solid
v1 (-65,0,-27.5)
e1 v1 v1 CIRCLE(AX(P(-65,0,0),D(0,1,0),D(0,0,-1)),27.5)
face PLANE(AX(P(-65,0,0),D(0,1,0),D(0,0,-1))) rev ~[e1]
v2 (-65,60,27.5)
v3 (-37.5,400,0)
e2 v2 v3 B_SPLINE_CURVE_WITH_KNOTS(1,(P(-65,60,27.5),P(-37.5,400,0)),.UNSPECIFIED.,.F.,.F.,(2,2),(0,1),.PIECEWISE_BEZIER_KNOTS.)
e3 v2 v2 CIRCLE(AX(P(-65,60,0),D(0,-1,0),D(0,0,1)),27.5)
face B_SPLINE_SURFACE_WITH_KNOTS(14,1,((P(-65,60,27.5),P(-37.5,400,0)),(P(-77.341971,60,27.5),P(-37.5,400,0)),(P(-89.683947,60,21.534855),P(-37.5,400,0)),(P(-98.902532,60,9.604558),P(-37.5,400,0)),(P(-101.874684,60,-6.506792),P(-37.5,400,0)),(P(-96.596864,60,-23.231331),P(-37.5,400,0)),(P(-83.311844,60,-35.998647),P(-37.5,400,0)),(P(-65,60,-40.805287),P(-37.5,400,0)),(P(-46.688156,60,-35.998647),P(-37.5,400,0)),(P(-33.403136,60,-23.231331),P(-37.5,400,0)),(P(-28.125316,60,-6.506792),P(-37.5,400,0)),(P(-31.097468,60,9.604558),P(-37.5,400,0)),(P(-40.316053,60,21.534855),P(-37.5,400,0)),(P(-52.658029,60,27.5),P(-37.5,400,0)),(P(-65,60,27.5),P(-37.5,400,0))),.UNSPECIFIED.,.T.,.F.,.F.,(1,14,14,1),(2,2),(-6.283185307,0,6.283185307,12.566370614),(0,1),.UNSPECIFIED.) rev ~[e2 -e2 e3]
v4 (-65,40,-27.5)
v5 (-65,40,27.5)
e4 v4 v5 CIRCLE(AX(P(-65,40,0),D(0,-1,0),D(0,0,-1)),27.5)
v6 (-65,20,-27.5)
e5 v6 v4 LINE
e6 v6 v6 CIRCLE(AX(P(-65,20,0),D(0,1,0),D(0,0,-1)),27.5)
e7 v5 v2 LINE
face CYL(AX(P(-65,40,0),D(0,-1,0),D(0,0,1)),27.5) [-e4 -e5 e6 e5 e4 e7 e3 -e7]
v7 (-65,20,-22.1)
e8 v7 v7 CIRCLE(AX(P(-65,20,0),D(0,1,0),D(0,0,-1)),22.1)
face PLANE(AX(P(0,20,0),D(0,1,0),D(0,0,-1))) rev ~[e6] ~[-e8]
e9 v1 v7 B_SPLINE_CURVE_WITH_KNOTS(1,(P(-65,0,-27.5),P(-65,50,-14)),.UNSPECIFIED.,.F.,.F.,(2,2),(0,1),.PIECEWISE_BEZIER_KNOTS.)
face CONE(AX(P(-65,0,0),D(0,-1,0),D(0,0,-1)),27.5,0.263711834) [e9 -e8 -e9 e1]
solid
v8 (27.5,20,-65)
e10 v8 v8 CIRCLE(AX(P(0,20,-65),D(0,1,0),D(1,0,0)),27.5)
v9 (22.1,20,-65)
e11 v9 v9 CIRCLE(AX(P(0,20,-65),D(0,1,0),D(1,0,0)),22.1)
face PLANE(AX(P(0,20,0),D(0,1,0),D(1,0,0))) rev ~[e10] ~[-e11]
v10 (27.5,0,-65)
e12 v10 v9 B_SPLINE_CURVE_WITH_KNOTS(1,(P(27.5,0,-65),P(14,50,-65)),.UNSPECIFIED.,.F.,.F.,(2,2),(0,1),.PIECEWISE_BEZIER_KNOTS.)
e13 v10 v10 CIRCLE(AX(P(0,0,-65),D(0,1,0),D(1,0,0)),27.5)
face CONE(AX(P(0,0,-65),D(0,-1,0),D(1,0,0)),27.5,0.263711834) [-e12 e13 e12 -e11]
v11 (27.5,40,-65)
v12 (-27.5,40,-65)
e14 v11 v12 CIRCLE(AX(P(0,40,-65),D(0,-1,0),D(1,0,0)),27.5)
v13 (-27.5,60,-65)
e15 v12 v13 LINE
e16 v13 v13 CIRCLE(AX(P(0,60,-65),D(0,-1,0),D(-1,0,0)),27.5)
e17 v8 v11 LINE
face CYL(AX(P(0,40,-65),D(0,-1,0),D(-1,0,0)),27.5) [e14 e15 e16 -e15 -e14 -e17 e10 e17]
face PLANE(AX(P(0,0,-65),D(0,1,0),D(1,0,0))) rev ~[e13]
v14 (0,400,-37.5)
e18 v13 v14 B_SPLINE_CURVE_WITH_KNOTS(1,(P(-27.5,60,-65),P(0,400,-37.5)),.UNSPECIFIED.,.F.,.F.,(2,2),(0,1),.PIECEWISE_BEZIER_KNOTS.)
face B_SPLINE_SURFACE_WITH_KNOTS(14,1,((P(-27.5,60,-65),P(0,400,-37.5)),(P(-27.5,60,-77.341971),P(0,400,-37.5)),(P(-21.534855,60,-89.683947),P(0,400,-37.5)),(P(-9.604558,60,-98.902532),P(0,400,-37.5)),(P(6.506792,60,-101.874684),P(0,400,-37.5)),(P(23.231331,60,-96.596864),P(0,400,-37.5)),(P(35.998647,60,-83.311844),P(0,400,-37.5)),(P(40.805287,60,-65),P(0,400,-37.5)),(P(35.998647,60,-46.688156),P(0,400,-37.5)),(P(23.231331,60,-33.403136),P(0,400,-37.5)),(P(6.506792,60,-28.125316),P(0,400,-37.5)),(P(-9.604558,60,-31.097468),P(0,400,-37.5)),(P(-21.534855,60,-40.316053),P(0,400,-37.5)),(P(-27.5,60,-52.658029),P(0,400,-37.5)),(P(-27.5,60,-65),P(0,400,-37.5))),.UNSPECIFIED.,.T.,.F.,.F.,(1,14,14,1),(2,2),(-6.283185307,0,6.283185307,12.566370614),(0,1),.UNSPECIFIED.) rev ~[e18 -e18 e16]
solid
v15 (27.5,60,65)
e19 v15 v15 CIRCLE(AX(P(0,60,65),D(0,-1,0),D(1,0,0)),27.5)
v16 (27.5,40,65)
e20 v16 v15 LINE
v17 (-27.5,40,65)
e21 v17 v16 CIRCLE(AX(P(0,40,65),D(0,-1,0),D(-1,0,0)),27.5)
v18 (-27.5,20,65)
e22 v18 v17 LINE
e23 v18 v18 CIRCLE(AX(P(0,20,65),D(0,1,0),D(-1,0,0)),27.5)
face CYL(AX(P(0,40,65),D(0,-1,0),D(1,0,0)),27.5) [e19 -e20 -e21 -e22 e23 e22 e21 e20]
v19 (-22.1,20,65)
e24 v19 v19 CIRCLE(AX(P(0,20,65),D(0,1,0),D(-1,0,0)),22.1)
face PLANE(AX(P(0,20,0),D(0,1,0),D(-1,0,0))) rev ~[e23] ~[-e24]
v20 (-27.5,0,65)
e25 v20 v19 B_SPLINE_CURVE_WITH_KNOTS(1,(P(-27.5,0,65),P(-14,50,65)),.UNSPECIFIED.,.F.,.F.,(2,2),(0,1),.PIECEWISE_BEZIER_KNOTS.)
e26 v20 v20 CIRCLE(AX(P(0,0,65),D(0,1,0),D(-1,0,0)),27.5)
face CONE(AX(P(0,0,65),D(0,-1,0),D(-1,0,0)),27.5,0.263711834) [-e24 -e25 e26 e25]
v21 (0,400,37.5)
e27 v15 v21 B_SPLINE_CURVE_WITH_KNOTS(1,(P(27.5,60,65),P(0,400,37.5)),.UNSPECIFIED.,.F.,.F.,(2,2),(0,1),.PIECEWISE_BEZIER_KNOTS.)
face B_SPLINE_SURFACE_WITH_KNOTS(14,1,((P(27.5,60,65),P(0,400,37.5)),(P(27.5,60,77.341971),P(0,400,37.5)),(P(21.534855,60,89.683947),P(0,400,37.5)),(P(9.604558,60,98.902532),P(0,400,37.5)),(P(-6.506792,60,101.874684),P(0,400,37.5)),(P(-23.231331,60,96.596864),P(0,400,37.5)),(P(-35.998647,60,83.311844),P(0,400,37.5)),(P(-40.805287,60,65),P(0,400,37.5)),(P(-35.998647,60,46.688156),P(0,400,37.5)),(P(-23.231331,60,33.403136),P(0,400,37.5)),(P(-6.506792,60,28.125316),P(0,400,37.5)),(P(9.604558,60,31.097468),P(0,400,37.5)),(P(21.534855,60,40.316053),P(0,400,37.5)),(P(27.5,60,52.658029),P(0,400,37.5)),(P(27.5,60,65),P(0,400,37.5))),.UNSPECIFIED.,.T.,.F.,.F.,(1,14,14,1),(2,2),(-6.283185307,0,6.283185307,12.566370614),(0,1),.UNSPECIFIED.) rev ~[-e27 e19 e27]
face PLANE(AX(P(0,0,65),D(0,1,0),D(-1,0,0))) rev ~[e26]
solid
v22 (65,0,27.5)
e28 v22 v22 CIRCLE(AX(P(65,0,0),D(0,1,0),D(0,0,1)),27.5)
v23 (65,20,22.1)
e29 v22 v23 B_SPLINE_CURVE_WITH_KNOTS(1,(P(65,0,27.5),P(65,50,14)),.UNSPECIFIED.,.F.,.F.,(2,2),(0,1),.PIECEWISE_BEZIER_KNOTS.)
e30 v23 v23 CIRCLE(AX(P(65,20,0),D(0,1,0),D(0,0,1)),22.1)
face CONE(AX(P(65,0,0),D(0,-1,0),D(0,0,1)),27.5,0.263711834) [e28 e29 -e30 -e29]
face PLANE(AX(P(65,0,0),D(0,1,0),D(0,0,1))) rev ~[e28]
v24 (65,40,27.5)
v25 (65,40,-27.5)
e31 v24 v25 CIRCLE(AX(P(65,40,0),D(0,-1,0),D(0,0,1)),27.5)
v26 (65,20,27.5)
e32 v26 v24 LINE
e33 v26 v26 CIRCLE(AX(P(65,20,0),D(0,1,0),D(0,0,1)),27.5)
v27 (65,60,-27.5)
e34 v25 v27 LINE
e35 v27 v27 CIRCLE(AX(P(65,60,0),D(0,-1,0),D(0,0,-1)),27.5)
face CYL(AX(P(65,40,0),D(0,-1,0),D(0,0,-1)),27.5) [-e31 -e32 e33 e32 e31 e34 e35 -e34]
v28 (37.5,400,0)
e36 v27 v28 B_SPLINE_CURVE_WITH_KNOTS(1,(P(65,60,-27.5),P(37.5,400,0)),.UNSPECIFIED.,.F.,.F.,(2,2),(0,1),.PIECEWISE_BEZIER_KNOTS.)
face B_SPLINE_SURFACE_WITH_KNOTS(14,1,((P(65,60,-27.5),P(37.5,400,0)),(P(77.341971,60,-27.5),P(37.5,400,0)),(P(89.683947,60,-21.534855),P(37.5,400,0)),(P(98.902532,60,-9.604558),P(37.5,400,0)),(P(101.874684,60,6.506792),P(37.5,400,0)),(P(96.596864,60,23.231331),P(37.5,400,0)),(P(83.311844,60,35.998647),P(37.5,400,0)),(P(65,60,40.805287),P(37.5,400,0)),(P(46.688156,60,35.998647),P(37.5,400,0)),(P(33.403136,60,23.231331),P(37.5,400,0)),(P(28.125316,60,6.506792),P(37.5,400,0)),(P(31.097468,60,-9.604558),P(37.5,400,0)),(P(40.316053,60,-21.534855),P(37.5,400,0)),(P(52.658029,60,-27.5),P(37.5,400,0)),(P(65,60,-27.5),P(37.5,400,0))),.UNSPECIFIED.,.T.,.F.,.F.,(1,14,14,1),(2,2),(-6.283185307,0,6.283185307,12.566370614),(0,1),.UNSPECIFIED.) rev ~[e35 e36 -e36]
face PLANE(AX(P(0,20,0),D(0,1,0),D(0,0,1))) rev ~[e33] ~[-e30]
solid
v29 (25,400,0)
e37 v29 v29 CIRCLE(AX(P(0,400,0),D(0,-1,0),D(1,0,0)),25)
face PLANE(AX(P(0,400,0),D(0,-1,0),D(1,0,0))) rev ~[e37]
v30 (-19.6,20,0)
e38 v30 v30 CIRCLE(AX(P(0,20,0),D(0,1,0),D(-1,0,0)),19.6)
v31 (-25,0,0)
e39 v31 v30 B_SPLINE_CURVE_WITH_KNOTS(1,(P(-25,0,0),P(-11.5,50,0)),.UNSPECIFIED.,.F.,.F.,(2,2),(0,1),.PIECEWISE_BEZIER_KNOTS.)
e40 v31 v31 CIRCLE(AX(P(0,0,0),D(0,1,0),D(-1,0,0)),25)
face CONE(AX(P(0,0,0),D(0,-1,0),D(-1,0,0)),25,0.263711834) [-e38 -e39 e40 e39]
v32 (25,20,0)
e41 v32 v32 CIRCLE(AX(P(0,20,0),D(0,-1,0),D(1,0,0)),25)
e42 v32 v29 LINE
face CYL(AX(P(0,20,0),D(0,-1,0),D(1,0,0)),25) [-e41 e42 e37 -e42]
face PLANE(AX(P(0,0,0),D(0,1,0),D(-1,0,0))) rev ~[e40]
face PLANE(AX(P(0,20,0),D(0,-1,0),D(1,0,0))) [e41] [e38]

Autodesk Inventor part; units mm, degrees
sketch "Sketch1" plane through (0, 0, 0) normal (0, 1, 0) x (-1, 0, 0)
  circle A0 centre (0, 0) radius 25
  dimension "d0" = 50
ref_plane "Work Plane1" through (0, 50, 0) normal (0, 1, 0) x (-1, 0, 0)
sketch "Sketch2" plane through (0, 50, 0) normal (0, 1, 0) x (-1, 0, 0)
  circle A0 centre (0, 0) radius 11.5
  dimension "d2" = 23
loft "Loft2" add profiles "Sketch1", "Sketch2"
ref_plane "Work Plane2" through (0, 20, 0) normal (0, -1, 0) x (1, 0, 0)
sketch "Sketch5" plane through (0, 20, 0) normal (0, -1, 0) x (1, 0, 0)
  circle A0 centre (0, 0) radius 25
extrude "Extrusion1" add sketch "Sketch5" against normal blind 380
sketch "Sketch6" plane through (0, 0, 0) normal (0, 1, 0) x (-1, 0, 0)
  line L0 (0, 0) -> (0, 65)
  line L1 (0, 65) -> (0, -65)
  circle A0 centre (0, 65) radius 27.5
  dimension "d27" = 65
  dimension "d28" = 130
  dimension "d29" = 55
ref_plane "Work Plane3" through (0, 50, 0) normal (0, 1, 0) x (-1, 0, 0)
sketch "Sketch7" plane through (0, 50, 0) normal (0, 1, 0) x (-1, 0, 0)
  circle A0 centre (0, 65) radius 14
  point P0 (0, 0)
  dimension "d32" = 28
loft "Loft3" add profiles "Sketch6", "Sketch7"
ref_plane "Work Plane4" through (0, 20, 0) normal (0, 1, 0) x (-1, 0, 0)
pattern_circular "Circular Pattern1" count 4 over 360 about axis through (0, -10, 0) along (0, 1, 0) of "Loft3"
sketch "Sketch8" plane through (0, 20, 0) normal (0, 1, 0) x (-1, 0, 0)
  point P0 (0, 0)
sketch "Sketch9" plane through (0, 20, 0) normal (0, 1, 0) x (-1, 0, 0)
  line L0 (0, 0) -> (0, 65)
  circle A0 centre (0, 65) radius 27.5
  dimension "d41" = 65
  dimension "d42" = 55
extrude "Extrusion2" add sketch "Sketch9" along normal blind 20
sketch "Sketch10" plane through (0, 40, 65) normal (0, 1, 0) x (1, 0, 0)
  line L0 (0, 65) -> (0, 0)
  circle A0 centre (0, 0) radius 27.5
  dimension "d45" = 65
  dimension "d46" = 55
extrude "Extrusion3" add sketch "Sketch10" along normal blind 20
sketch "Sketch11" plane through (0, 400, 0) normal (0, 1, 0) x (1, 0, 0)
  circle A0 centre (0, -65) radius 27.5 projected
  circle A1 centre (0, -65) radius 27.5 projected
  point P0 (0, 0)
  point P1 (0, -37.5)
pattern_circular "Circular Pattern2" count 4 over 360 about axis through (0, -10, 0) along (0, 1, 0) of "Extrusion2", "Extrusion3"
loft "Loft4" add section 1 edges at (-27.5, 60, 65) section 2 point at (0, 400, 37.5)
pattern_circular "Circular Pattern3" count 4 over 360 about axis through (0, -10, 0) along (0, 1, 0) of "Loft4"
properties part number "soyuz"
